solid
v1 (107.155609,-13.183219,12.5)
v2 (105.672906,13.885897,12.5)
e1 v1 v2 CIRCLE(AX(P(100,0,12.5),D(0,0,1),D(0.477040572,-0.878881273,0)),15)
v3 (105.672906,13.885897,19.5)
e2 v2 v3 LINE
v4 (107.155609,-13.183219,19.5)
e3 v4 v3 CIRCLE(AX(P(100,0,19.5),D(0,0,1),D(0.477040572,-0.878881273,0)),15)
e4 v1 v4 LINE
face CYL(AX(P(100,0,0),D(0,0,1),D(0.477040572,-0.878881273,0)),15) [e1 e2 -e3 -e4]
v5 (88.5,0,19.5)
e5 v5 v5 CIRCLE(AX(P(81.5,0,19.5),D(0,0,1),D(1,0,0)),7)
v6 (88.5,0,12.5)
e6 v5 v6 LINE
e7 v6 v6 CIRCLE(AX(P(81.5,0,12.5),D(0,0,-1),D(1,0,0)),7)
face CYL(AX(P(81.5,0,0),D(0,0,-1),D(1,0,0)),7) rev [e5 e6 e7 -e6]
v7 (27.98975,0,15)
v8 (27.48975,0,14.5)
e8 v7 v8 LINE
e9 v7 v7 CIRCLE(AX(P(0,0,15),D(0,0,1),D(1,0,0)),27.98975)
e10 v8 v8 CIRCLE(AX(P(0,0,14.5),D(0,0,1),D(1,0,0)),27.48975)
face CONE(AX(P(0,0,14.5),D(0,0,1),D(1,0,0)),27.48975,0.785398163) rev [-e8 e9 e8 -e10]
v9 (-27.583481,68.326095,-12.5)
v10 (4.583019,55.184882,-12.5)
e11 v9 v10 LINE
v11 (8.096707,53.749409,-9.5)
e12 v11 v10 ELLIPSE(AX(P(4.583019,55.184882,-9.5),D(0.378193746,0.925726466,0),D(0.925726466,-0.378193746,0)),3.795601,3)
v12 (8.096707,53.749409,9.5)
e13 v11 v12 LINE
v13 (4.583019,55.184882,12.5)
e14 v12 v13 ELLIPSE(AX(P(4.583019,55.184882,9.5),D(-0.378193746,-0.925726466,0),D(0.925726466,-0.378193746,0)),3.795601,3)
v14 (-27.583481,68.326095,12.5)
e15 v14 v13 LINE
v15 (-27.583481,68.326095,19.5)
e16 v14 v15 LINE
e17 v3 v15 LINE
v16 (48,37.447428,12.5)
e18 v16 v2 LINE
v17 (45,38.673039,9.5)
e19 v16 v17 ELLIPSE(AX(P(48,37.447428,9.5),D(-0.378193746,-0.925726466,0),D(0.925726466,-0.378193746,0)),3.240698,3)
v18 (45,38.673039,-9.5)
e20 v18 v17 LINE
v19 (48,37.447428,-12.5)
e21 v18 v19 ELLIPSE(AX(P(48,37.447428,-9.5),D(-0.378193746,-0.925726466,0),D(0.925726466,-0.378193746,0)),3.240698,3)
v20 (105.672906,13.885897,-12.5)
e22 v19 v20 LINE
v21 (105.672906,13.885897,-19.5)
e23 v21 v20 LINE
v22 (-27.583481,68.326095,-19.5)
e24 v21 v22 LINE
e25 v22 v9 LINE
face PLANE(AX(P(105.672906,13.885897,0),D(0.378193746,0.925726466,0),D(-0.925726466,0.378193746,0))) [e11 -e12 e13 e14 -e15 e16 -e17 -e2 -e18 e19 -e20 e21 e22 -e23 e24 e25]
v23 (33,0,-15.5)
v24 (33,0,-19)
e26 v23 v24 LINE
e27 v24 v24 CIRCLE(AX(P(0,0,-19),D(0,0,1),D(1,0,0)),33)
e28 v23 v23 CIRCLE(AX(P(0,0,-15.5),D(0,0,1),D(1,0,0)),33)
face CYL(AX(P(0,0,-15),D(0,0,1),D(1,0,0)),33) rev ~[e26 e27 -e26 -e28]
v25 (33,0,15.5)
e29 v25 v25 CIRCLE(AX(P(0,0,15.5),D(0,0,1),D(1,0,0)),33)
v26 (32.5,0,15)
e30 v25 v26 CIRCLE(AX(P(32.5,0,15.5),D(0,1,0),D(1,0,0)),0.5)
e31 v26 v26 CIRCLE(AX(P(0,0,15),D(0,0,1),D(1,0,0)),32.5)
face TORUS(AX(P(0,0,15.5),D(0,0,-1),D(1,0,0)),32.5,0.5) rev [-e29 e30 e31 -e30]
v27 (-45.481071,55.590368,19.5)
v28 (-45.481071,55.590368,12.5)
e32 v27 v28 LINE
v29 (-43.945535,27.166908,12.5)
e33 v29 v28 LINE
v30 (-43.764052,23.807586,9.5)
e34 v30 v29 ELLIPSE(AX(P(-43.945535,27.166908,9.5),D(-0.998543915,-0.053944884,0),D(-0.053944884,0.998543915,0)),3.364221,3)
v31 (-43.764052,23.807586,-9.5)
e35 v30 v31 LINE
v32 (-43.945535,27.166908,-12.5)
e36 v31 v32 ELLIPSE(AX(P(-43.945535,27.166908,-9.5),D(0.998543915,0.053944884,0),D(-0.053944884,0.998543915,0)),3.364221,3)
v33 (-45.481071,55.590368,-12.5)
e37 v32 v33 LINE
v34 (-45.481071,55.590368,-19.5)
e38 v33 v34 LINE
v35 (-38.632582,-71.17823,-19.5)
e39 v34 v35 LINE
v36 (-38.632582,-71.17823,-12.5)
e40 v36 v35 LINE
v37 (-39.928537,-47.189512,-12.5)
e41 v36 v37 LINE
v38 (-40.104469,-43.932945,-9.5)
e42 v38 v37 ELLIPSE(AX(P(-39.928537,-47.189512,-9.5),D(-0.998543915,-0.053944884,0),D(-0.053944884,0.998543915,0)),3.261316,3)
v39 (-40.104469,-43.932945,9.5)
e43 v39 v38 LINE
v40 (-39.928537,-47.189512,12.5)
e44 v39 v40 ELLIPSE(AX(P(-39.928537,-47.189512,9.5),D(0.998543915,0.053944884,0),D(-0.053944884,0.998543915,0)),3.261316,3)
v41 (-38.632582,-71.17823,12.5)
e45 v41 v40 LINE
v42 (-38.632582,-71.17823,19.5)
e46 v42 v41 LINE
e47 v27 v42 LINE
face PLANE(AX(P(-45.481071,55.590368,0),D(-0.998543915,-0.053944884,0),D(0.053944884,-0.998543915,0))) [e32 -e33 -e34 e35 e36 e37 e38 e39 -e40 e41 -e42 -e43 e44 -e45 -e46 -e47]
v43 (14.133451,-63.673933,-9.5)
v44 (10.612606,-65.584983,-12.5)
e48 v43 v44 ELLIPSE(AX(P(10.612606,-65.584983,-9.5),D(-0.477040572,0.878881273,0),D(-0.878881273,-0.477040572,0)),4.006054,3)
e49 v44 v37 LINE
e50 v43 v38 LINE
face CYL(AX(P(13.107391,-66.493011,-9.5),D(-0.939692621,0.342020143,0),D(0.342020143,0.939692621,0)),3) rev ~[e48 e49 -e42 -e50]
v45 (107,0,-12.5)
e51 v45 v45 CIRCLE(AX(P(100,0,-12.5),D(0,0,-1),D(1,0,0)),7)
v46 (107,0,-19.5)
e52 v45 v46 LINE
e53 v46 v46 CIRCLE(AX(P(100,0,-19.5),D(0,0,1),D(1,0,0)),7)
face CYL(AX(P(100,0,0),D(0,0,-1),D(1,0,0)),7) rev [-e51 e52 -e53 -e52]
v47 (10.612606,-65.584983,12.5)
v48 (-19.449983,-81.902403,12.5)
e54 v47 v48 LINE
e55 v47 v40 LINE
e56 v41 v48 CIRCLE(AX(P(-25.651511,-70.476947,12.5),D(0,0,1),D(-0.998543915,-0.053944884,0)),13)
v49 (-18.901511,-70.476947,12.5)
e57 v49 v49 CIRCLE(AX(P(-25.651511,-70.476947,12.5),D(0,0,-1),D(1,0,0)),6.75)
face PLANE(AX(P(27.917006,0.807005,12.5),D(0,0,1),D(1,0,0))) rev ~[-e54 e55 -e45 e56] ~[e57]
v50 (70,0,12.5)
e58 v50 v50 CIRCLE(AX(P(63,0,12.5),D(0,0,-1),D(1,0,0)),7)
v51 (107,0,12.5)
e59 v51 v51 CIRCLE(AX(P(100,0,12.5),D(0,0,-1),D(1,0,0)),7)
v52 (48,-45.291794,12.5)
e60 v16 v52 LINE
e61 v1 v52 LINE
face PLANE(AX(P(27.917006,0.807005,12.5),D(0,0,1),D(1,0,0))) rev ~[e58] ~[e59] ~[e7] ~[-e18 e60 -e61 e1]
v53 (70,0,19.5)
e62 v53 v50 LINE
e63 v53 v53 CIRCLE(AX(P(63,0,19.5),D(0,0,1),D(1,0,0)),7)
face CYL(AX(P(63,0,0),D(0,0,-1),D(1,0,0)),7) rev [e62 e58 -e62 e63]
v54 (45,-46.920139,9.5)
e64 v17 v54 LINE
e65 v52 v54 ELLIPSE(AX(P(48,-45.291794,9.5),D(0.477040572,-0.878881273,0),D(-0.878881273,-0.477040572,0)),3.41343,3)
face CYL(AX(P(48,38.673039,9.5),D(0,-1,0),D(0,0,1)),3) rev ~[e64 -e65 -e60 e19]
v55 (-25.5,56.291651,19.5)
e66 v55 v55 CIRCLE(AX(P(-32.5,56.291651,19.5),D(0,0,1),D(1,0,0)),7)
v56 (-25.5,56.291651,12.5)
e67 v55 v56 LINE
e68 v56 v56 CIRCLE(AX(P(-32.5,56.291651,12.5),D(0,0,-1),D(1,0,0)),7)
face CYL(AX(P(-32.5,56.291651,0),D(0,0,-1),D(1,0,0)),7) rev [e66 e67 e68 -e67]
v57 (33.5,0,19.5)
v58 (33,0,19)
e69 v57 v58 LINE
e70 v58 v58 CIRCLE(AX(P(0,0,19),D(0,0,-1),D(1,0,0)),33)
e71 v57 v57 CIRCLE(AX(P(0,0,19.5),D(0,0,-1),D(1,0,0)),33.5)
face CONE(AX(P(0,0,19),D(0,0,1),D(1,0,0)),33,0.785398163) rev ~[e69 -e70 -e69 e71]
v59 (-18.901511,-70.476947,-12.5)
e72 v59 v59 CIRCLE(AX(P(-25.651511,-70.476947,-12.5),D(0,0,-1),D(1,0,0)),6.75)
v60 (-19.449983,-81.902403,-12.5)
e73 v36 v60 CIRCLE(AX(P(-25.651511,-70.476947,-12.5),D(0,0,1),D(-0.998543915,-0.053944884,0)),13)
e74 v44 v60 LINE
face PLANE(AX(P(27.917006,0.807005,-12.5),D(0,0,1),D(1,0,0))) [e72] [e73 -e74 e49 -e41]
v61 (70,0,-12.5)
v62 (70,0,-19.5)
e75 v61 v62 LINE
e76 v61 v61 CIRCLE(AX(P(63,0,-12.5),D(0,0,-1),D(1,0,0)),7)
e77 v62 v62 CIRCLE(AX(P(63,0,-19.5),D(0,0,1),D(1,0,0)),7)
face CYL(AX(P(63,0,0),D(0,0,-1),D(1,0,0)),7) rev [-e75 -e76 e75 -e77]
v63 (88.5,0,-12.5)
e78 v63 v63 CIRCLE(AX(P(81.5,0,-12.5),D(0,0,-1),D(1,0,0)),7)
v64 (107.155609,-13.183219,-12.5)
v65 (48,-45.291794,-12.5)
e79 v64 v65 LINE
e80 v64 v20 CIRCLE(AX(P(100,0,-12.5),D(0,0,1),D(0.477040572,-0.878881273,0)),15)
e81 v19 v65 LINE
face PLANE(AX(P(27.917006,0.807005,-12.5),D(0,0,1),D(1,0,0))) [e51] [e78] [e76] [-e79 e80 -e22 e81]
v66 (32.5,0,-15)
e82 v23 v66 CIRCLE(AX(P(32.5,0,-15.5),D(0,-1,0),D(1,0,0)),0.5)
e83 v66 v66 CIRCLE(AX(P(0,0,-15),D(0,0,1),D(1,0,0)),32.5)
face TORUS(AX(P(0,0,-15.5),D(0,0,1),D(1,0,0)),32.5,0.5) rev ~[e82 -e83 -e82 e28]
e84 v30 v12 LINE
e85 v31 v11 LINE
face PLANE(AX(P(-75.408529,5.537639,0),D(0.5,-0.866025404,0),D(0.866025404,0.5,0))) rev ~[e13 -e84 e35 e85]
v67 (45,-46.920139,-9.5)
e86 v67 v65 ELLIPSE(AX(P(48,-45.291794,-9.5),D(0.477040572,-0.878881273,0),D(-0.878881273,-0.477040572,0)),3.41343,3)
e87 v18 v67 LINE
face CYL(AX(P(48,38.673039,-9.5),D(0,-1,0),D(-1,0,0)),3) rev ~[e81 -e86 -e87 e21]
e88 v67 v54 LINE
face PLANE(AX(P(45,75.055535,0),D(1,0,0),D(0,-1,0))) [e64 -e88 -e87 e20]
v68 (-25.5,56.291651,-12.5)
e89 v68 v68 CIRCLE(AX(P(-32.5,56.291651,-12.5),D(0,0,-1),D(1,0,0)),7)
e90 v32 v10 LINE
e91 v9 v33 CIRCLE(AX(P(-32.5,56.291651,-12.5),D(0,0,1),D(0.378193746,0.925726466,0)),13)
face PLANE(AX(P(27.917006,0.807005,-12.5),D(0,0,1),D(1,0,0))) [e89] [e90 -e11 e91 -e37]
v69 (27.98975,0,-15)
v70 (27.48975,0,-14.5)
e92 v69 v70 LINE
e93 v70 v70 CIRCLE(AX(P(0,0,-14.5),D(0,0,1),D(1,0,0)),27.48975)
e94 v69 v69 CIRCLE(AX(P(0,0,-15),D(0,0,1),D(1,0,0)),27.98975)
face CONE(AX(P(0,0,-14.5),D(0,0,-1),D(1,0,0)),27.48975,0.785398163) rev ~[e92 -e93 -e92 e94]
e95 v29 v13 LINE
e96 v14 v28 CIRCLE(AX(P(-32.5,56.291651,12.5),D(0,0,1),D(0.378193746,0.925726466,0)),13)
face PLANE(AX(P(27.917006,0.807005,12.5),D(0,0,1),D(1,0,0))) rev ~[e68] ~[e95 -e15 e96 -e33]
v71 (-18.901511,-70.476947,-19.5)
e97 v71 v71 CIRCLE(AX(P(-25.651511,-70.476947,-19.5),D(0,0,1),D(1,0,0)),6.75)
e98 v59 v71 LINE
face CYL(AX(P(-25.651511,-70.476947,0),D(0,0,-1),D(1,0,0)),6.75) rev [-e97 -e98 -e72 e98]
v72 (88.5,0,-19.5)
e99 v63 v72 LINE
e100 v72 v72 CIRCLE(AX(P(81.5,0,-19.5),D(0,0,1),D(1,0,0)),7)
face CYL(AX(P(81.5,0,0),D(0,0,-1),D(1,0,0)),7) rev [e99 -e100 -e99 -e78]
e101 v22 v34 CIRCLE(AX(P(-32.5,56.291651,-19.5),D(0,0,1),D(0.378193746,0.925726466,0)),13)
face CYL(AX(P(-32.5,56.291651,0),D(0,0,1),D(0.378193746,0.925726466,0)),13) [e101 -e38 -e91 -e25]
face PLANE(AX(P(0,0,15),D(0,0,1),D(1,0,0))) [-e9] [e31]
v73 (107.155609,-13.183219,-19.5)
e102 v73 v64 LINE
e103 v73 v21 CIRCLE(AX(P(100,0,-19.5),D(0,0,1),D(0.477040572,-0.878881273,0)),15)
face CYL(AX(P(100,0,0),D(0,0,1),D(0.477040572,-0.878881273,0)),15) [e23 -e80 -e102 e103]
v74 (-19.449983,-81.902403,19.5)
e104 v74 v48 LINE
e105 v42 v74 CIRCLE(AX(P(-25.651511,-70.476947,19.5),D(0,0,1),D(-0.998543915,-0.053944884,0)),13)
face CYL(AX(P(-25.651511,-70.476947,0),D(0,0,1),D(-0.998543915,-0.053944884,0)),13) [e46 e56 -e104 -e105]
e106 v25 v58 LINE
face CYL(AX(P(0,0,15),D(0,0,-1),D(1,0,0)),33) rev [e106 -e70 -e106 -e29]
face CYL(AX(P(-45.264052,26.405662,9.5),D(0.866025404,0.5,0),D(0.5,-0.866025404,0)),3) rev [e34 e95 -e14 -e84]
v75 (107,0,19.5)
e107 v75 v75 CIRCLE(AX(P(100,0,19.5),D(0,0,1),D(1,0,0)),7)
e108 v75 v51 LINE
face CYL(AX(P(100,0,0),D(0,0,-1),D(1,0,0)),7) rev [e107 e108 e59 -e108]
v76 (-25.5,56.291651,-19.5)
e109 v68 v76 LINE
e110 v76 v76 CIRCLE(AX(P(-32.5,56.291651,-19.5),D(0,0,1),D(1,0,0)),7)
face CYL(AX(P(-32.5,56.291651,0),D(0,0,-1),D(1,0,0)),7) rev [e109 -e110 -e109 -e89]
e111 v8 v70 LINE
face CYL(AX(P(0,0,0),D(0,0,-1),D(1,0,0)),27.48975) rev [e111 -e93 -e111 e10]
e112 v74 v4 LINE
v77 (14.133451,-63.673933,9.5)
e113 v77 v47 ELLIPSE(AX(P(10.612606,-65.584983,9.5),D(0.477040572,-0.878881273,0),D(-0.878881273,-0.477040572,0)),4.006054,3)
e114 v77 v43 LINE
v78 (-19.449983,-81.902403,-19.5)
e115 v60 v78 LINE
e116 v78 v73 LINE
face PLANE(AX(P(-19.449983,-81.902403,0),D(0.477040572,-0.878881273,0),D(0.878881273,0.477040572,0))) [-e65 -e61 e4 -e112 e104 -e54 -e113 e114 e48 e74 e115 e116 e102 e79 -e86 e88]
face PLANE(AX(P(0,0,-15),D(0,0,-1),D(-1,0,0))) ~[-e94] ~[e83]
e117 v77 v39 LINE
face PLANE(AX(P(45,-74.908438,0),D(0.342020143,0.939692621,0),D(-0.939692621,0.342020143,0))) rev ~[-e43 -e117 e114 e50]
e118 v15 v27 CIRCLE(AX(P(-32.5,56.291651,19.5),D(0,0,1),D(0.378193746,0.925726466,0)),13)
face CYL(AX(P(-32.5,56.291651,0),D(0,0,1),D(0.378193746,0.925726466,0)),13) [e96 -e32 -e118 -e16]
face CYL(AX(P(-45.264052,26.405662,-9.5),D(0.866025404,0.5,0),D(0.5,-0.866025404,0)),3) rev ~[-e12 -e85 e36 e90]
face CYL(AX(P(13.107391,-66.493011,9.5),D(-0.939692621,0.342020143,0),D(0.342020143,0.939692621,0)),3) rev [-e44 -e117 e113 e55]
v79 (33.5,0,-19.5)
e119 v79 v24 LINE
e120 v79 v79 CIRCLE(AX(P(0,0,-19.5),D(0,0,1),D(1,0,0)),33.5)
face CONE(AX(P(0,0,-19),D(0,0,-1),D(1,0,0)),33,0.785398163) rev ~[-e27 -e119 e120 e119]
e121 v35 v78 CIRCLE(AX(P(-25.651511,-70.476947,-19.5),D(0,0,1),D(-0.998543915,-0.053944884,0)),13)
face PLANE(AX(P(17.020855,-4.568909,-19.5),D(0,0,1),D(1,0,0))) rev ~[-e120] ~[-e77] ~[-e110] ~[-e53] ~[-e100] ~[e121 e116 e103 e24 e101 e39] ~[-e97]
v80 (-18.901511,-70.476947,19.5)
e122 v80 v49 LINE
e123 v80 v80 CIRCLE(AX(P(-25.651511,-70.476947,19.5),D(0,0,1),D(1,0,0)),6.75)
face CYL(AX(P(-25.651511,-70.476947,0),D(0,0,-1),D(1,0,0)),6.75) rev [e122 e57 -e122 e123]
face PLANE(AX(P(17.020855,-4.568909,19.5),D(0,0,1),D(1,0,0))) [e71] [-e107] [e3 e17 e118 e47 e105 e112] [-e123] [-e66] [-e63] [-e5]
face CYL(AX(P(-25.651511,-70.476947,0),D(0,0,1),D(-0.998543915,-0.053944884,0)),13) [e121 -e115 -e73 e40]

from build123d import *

# Parameters (mm, degrees)
F0_R          = 6.75
F0_R_2        = 33
F0_R_3        = 7
F0_R_4        = 27.48975
F1_DEPTH      = 19.5
F1_DEPTH_BACK = 19.5
F2_START      = 15
F2_DEPTH      = 10
F6_DEPTH      = 12.5
F6_DEPTH_BACK = 12.5
F7_R          = 3
F8_SIZE       = 0.5
F9_R          = 0.5


# Not quite as in the source:
# - a feature names something its author has since deleted; it is built from what else it names


with BuildPart() as f1:
    # F0 (on Top) → F1 (new body, two sides)
    with BuildSketch(Plane.XY) as f1_sk:
        with BuildLine():
            Line((-19.4499833155, -81.9024031138), (107.1556085776, -13.1832191017))
            ThreePointArc((107.1556085776, -13.1832191017), (114.9775485096, 0.8203905436), (105.6729061946, 13.8858969933))
            Line((105.6729061946, 13.8858969933), (-27.583481298, 68.3260953068))
            ThreePointArc((-27.583481298, 68.3260953068), (-40.0371705269, 66.8836794016), (-45.4810708907, 55.5903677578))
            Line((-45.4810708907, 55.5903677578), (-38.6325816401, -71.1782300471))
            ThreePointArc((-38.6325816401, -71.1782300471), (-31.9952103295, -81.8240816881), (-19.4499833155, -81.9024031138))
        make_face()
        with Locations((-25.6515107494, -70.4769465589)):
            Circle(F0_R, mode=Mode.SUBTRACT)
        Circle(F0_R_2, mode=Mode.SUBTRACT)
        with Locations((-32.5, 56.291651246)):
            Circle(F0_R_3, mode=Mode.SUBTRACT)
        with Locations((63, 0)):
            Circle(F0_R_3, mode=Mode.SUBTRACT)
        with Locations((81.5, 0)):
            Circle(F0_R_3, mode=Mode.SUBTRACT)
        with Locations((100, 0)):
            Circle(F0_R_3, mode=Mode.SUBTRACT)
        Circle(F0_R_2)
        Circle(F0_R_4, mode=Mode.SUBTRACT)
    extrude(amount=F1_DEPTH)
    extrude(f1_sk.sketch, amount=-F1_DEPTH_BACK)


with BuildPart() as f2:
    # F0 (on Top) → F2 (new body)
    with BuildSketch(Plane.XY.offset(F2_START)):
        Circle(F0_R_2)
        Circle(F0_R_4, mode=Mode.SUBTRACT)
    extrude(amount=F2_DEPTH)


with BuildPart() as f3_1:
    # F3: instance of F2
    add(f2.part.mirror(Plane.XY))


with BuildPart() as f1_1:
    add(f1.part)

    # F4: cut F2, F3_1
    add(f2.part, mode=Mode.SUBTRACT)
    add(f3_1.part, mode=Mode.SUBTRACT)

    # F5 (on Top) → F6 (cut, two sides)
    with BuildSketch(Plane.XY) as f6_sk:
        Polygon((-66.9979324298, -150.1462552281), (233.1545138204, 12.7709657028), (-82.7719960075, 141.8387137572), (-75.4085285246, 5.5376386383), (45, 75.0555349947), (45, -74.9084380282), (-73.3904532444, -31.8178370259), align=None)
    extrude(amount=-F6_DEPTH, mode=Mode.SUBTRACT)
    extrude(f6_sk.sketch, amount=F6_DEPTH_BACK, mode=Mode.SUBTRACT)

    # F7
    f7_edges = [f1_1.edges().sort_by_distance(p)[0] for p in [
        (45, -4.12355, -12.5),
        (-17.833672, 38.778497, -12.5),
        (-17.833672, 38.778497, 12.5),
        (45, -4.12355, 12.5),
        (-12.985509, -53.803439, 12.5),
        (-12.985509, -53.803439, -12.5),
    ]]
    fillet(f7_edges, radius=F7_R)

    # F8
    f8_edges = [f1_1.edges().sort_by_distance(p)[0] for p in [
        (-27.48975, 0, 15),
        (-27.48975, 0, -15),
        (-33, 0, 19.5),
        (-33, 0, -19.5),
    ]]
    chamfer(f8_edges, length=F8_SIZE)

    # F9
    f9_edges = [f1_1.edges().sort_by_distance(p)[0] for p in [
        (-33, 0, -15),
        (-33, 0, 15),
    ]]
    fillet(f9_edges, radius=F9_R)


solid = f1_1.part
